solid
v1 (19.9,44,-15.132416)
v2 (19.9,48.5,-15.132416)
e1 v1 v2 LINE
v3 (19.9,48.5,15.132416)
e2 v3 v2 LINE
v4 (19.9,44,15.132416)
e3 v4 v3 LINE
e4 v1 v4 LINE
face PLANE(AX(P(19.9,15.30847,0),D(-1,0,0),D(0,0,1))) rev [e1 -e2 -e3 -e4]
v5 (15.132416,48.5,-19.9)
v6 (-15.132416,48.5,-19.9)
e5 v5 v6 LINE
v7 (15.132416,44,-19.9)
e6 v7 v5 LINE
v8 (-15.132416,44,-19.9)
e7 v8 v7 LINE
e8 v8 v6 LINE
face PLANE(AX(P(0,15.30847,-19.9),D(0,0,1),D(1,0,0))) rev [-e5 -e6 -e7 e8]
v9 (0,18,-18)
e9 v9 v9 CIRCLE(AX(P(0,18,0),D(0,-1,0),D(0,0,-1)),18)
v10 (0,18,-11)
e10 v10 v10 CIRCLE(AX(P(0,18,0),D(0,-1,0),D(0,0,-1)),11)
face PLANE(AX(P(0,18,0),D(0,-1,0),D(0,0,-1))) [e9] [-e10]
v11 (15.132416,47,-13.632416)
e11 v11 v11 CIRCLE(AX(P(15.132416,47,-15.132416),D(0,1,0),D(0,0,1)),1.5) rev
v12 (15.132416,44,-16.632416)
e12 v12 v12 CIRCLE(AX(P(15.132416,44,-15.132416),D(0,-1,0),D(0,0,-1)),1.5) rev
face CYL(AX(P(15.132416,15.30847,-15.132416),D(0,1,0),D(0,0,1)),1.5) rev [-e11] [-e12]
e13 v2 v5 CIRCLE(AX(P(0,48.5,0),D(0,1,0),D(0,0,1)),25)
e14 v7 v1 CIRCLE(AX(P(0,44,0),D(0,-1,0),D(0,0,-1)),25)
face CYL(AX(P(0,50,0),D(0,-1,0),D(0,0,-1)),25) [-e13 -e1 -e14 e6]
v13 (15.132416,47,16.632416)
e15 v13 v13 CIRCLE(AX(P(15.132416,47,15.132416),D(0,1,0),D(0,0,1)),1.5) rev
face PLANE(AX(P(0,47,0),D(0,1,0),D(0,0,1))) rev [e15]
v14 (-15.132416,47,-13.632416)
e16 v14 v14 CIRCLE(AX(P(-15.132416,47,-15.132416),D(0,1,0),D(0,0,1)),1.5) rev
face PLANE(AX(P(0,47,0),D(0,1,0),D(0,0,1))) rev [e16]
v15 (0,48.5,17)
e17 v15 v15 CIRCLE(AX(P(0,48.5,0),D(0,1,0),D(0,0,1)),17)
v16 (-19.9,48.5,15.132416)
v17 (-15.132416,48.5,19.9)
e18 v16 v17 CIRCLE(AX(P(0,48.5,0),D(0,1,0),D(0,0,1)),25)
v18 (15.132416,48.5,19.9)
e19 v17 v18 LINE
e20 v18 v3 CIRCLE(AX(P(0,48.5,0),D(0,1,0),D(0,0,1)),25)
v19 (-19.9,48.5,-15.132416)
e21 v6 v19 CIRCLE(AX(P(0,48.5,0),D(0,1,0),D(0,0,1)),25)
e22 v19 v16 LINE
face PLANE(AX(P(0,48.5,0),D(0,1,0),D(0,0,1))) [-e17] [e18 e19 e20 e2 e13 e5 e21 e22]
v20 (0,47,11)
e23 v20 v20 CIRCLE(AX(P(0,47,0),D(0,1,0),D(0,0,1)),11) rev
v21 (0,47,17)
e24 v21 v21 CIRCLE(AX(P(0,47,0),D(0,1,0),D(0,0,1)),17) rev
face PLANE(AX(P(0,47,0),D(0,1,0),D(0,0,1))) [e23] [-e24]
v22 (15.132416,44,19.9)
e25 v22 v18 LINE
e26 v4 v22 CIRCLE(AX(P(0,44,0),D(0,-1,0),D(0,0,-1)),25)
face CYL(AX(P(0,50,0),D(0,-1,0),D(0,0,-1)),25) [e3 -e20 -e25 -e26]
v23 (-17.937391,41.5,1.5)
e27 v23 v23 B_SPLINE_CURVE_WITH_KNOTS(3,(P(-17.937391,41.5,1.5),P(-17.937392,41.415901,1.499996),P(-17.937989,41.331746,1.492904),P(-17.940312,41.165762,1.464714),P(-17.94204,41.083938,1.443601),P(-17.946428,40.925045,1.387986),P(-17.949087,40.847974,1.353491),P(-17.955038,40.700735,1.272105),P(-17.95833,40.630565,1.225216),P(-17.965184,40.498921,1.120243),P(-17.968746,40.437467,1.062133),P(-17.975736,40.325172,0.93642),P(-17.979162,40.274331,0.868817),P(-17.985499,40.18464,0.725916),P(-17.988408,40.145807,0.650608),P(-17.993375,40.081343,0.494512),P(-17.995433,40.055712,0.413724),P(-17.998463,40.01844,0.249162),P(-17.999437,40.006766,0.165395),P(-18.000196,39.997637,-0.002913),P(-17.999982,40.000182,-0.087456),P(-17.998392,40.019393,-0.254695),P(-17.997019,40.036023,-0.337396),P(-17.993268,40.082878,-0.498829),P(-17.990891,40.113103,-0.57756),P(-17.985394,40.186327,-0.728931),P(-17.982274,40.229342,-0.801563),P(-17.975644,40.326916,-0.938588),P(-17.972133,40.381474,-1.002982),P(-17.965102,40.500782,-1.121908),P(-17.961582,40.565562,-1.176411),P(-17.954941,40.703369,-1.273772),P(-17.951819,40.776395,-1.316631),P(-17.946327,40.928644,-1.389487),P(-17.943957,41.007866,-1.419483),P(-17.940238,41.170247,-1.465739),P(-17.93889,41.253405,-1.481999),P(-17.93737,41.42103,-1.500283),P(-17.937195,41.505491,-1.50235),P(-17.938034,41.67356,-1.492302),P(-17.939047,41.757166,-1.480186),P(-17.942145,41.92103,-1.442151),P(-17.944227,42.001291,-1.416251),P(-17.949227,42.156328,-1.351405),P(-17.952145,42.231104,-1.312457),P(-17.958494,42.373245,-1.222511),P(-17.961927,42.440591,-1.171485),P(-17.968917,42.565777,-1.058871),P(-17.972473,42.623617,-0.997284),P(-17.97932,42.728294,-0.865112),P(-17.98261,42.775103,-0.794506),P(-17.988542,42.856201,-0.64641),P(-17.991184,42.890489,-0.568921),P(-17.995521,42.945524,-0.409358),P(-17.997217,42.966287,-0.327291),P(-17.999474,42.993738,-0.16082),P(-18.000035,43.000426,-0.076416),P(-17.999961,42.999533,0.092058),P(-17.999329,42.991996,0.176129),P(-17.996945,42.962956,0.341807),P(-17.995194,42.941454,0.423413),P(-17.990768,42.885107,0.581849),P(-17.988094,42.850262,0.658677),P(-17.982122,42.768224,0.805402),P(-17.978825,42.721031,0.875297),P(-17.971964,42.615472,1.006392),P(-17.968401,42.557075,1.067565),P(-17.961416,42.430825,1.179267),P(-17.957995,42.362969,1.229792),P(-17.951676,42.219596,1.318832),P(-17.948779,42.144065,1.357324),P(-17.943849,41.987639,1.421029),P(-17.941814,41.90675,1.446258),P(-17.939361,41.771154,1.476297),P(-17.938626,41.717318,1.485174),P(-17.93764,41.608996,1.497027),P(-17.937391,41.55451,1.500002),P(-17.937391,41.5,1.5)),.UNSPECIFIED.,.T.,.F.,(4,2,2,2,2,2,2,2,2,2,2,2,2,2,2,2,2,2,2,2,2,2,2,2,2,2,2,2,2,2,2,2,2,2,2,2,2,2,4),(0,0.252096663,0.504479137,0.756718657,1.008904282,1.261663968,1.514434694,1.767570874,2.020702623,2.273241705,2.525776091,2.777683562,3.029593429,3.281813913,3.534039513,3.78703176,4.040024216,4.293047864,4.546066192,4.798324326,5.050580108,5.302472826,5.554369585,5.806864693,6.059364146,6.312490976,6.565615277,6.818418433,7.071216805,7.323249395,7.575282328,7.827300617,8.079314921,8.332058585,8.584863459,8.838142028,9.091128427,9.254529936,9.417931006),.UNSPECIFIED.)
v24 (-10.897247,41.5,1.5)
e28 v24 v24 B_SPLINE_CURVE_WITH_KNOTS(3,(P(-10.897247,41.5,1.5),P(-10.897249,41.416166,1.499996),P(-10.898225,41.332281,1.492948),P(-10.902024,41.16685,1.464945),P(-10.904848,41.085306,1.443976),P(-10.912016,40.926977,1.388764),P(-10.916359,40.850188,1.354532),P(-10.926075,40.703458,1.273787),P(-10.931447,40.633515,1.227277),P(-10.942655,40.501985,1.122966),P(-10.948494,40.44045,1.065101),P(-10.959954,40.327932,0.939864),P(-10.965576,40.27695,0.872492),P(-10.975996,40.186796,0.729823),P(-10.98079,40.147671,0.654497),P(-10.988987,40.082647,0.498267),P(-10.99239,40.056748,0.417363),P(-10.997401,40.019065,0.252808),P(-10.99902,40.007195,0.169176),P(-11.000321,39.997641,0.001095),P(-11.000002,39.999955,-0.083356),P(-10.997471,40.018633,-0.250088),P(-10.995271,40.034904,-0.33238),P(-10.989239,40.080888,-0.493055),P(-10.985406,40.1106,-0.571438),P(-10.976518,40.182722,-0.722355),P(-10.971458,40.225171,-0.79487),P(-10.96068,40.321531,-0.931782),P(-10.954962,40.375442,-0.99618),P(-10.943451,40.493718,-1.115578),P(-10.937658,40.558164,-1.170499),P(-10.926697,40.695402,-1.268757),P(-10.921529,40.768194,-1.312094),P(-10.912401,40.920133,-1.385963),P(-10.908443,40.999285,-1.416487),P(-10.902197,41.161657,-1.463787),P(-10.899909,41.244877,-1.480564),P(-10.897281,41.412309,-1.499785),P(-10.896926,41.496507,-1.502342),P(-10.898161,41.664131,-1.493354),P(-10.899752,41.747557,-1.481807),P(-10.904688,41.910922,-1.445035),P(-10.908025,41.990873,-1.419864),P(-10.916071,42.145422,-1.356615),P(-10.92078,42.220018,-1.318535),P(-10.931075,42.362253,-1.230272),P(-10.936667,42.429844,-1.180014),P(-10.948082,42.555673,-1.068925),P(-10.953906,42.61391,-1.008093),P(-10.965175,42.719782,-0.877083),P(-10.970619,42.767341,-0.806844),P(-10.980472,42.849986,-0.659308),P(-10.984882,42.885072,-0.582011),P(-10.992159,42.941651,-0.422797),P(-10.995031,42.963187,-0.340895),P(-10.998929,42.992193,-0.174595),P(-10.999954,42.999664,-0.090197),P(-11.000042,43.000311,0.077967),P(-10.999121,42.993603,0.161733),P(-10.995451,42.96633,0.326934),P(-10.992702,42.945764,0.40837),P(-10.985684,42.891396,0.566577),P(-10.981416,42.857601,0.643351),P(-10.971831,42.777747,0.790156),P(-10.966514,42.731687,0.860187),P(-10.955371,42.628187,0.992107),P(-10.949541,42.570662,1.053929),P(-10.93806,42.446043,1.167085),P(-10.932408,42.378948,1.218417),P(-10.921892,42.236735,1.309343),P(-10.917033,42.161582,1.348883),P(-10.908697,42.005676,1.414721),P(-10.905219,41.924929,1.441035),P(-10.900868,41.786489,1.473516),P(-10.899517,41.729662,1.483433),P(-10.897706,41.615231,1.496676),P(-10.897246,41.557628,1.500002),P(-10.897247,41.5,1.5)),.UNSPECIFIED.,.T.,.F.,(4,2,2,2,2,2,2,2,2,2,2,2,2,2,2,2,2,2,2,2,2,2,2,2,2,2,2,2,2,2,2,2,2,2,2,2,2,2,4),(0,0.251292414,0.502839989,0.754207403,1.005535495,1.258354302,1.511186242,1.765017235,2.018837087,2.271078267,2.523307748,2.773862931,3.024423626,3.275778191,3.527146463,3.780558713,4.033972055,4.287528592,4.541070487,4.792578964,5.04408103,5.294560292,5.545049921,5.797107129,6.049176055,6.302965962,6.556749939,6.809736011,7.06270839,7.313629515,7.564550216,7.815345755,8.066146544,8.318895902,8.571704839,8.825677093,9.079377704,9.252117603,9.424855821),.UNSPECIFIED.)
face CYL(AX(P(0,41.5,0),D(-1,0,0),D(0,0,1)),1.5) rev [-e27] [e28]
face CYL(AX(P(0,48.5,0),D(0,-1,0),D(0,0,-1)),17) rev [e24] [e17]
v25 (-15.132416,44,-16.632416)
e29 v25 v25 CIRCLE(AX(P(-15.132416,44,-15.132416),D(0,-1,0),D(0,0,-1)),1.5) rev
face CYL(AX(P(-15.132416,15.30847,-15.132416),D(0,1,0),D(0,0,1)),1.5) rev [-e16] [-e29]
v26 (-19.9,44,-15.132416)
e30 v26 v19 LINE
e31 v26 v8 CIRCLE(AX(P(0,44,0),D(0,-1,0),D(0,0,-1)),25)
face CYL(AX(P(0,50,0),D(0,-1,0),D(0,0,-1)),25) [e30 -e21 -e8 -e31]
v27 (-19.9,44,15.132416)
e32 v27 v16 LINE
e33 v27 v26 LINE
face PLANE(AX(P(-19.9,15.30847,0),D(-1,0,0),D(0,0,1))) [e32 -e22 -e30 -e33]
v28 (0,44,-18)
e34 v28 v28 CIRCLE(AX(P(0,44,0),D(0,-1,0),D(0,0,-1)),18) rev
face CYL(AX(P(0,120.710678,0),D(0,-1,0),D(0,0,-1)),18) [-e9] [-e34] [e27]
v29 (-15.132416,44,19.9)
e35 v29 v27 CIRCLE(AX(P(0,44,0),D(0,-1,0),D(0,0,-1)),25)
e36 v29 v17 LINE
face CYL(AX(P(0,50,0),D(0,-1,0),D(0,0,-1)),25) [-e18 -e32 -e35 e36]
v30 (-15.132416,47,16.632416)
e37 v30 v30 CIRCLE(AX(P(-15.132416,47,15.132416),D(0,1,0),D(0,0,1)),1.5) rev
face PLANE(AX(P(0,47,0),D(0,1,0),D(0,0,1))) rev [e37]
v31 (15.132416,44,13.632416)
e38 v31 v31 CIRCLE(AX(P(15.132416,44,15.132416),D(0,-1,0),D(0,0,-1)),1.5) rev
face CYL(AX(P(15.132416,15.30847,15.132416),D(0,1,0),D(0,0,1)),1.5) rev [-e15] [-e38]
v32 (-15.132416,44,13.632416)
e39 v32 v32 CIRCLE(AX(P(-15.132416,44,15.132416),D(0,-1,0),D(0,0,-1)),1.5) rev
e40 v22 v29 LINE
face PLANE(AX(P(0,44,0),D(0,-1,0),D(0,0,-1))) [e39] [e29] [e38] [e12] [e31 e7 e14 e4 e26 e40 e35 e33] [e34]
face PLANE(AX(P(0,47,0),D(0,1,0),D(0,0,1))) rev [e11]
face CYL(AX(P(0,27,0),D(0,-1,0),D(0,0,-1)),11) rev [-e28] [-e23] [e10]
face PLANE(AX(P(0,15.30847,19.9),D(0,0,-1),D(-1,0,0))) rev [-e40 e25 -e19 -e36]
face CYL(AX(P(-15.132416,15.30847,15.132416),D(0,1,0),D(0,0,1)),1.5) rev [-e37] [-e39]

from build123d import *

# Parameters (mm, degrees)
SKETCH1_R              = 25
BOSS_EXTRUDE1_DEPTH    = 50
SKETCH2_R              = 25
SKETCH2_R_2            = 18
CUT_EXTRUDE1_DEPTH     = 46
CUT_EXTRUDE2_START     = -4
CUT_EXTRUDE2_OUTLINE_R = 1.5
CUT_EXTRUDE2_DEPTH     = 4
SKETCH6_R              = 6.5
CUT_EXTRUDE5_DEPTH     = 5
SKETCH8_R              = 11
CUT_EXTRUDE6_DEPTH     = 13
SKETCH9_R              = 11
CUT_EXTRUDE7_DEPTH     = 5
SKETCH10_R             = 4
CUT_EXTRUDE8_DEPTH     = 58.37612744
SKETCH11_R             = 11
SKETCH11_R_2           = 4
CUT_EXTRUDE9_DEPTH     = 27
SKETCH13_R             = 18
SKETCH13_R_2           = 11
CUT_EXTRUDE10_DEPTH    = 18
CUT_EXTRUDE13_START    = -3
CUT_EXTRUDE13_DEPTH    = 3
BOSS_EXTRUDE4_START    = 2
SKETCH19_R             = 1.5
SKETCH19_R_2           = 18
BOSS_EXTRUDE4_DEPTH    = 2
F_3DSKETCH11_R         = 1.5
CUT_EXTRUDE14_DEPTH    = 19.9
SKETCH20_R             = 11
CUT_EXTRUDE15_DEPTH    = 5
SKETCH21_R             = 17
BOSS_EXTRUDE5_DEPTH    = 1.5


with BuildPart() as part:
    # Sketch1 → Boss-Extrude1 (new body)
    with BuildSketch(Plane(origin=(0, 0, 0), x_dir=(1, 0, 0), z_dir=(0, 1, 0))):
        with Locations(Location((0, 0, 0), (0, 0, 270))):
            Circle(SKETCH1_R)
    extrude(amount=BOSS_EXTRUDE1_DEPTH)

    # Sketch2 → Cut-Extrude1 (cut)
    with BuildSketch(Plane.XZ):
        with Locations(Location((0, 0, 0), (0, 0, 90))):
            Circle(SKETCH2_R)
        with Locations(Location((0, 0, 0), (0, 0, 270))):
            Circle(SKETCH2_R_2, mode=Mode.SUBTRACT)
    extrude(amount=-CUT_EXTRUDE1_DEPTH, mode=Mode.SUBTRACT)

    # Cut-Extrude2: read off the stored shape, not the designer's step
    # Cut-Extrude2 outline → Cut-Extrude2 (cut)
    with BuildSketch(Plane(origin=(0, 50, 0), x_dir=(1, 0, 0), z_dir=(0, 1, 0)).offset(CUT_EXTRUDE2_START)):
        with BuildLine():
            ThreePointArc((-15.132415538, -19.9), (0, -25), (15.132415538, -19.9))
            Line((15.132415538, -19.9), (-15.132415538, -19.9))
        make_face()
        with BuildLine():
            Line((19.9, 15.132415538), (19.9, -15.132415538))
            ThreePointArc((19.9, -15.132415538), (25, 0), (19.9, 15.132415538))
        make_face()
        with BuildLine():
            ThreePointArc((-19.9, 15.132415538), (-25, 0), (-19.9, -15.132415538))
            Line((-19.9, -15.132415538), (-19.9, 15.132415538))
        make_face()
        with BuildLine():
            Line((-15.132415538, 19.9), (15.132415538, 19.9))
            ThreePointArc((15.132415538, 19.9), (0, 25), (-15.132415538, 19.9))
        make_face()
        with Locations((-15.132415538, -15.132415538)):
            Circle(CUT_EXTRUDE2_OUTLINE_R)
        with Locations((15.132415538, -15.132415538)):
            Circle(CUT_EXTRUDE2_OUTLINE_R)
        with Locations((-15.132415538, 15.132415538)):
            Circle(CUT_EXTRUDE2_OUTLINE_R)
        with Locations((15.132415538, 15.132415538)):
            Circle(CUT_EXTRUDE2_OUTLINE_R)
    extrude(amount=CUT_EXTRUDE2_DEPTH, mode=Mode.SUBTRACT)

    # Sketch6 → Cut-Extrude5 (cut)
    with BuildSketch(Plane(origin=(0, 50, 0), x_dir=(1, 0, 0), z_dir=(0, 1, 0))):
        with Locations(Location((0, 0, 0), (0, 0, 270))):
            Circle(SKETCH6_R)
    extrude(amount=-CUT_EXTRUDE5_DEPTH, mode=Mode.SUBTRACT)

    # Sketch8 → Cut-Extrude6 (cut)
    with BuildSketch(Plane(origin=(0, 45, 0), x_dir=(1, 0, 0), z_dir=(0, 1, 0))):
        with Locations(Location((0, 0, 0), (0, 0, 270))):
            Circle(SKETCH8_R)
    extrude(amount=-CUT_EXTRUDE6_DEPTH, mode=Mode.SUBTRACT)

    # Sketch9 → Cut-Extrude7 (cut)
    with BuildSketch(Plane(origin=(0, 50, 0), x_dir=(1, 0, 0), z_dir=(0, 1, 0))):
        with Locations(Location((0, 0, 0), (0, 0, 270))):
            Circle(SKETCH9_R)
    extrude(amount=-CUT_EXTRUDE7_DEPTH, mode=Mode.SUBTRACT)

    # Sketch10 → Cut-Extrude8 (cut, through all)
    with BuildSketch(Plane.XZ):
        with Locations(Location((0, 0, 0), (0, 0, 270))):
            Circle(SKETCH10_R)
    extrude(amount=-CUT_EXTRUDE8_DEPTH, mode=Mode.SUBTRACT)

    # Sketch11 → Cut-Extrude9 (cut)
    with BuildSketch(Plane.XZ):
        with Locations(Location((0, 0, 0), (0, 0, 90))):
            Circle(SKETCH11_R)
        with Locations(Location((0, 0, 0), (0, 0, 270))):
            Circle(SKETCH11_R_2, mode=Mode.SUBTRACT)
    extrude(amount=-CUT_EXTRUDE9_DEPTH, mode=Mode.SUBTRACT)

    # Sketch13 → Cut-Extrude10 (cut)
    with BuildSketch(Plane.XZ):
        with Locations(Location((0, 0, 0), (0, 0, 270))):
            Circle(SKETCH13_R)
        with Locations(Location((0, 0, 0), (0, 0, 270))):
            Circle(SKETCH13_R_2, mode=Mode.SUBTRACT)
    extrude(amount=-CUT_EXTRUDE10_DEPTH, mode=Mode.SUBTRACT)

    # Sketch18 → Cut-Extrude13 (cut)
    with BuildSketch(Plane(origin=(0, 50, 0), x_dir=(1, 0, 0), z_dir=(0, 1, 0)).offset(CUT_EXTRUDE13_START)):
        with BuildLine():
            Line((-19.9, 15.132415538), (-19.9, -15.132415538))
            ThreePointArc((-19.9, -15.132415538), (-17.67766953, -17.67766953), (-15.132415538, -19.9))
            Line((-15.132415538, -19.9), (15.132415538, -19.9))
            ThreePointArc((15.132415538, -19.9), (17.67766953, -17.67766953), (19.9, -15.132415538))
            Line((19.9, -15.132415538), (19.9, 15.132415538))
            ThreePointArc((19.9, 15.132415538), (17.67766953, 17.67766953), (15.132415538, 19.9))
            Line((15.132415538, 19.9), (-15.132415538, 19.9))
            ThreePointArc((-15.132415538, 19.9), (-17.67766953, 17.67766953), (-19.9, 15.132415538))
        make_face()
    extrude(amount=CUT_EXTRUDE13_DEPTH, mode=Mode.SUBTRACT)

    # Sketch19 → Boss-Extrude4 (add)
    with BuildSketch(Plane.XZ.offset(-46).offset(BOSS_EXTRUDE4_START)):
        with BuildLine():
            ThreePointArc((-15.132415538, 19.9), (-17.67766953, 17.67766953), (-19.9, 15.132415538))
            Line((-19.9, 15.132415538), (-19.9, -15.132415538))
            ThreePointArc((-19.9, -15.132415538), (-17.67766953, -17.67766953), (-15.132415538, -19.9))
            Line((-15.132415538, -19.9), (15.132415538, -19.9))
            ThreePointArc((15.132415538, -19.9), (17.67766953, -17.67766953), (19.9, -15.132415538))
            Line((19.9, -15.132415538), (19.9, 15.132415538))
            ThreePointArc((19.9, 15.132415538), (17.67766953, 17.67766953), (15.132415538, 19.9))
            Line((15.132415538, 19.9), (-15.132415538, 19.9))
        make_face()
        with Locations(Location((-15.132415538, -15.132415538, 0), (0, 0, 90))):
            Circle(SKETCH19_R, mode=Mode.SUBTRACT)
        with Locations(Location((-15.132415538, 15.132415538, 0), (0, 0, 90))):
            Circle(SKETCH19_R, mode=Mode.SUBTRACT)
        with Locations(Location((0, 0, 0), (0, 0, 270))):
            Circle(SKETCH19_R_2, mode=Mode.SUBTRACT)
        with Locations(Location((15.132415538, 15.132415538, 0), (0, 0, 90))):
            Circle(SKETCH19_R, mode=Mode.SUBTRACT)
        with Locations(Location((15.132415538, -15.132415538, 0), (0, 0, 90))):
            Circle(SKETCH19_R, mode=Mode.SUBTRACT)
    extrude(amount=-BOSS_EXTRUDE4_DEPTH)

    # 3DSketch11 → Cut-Extrude14 (cut)
    with BuildSketch(Plane(origin=(0, 44, 0), x_dir=(0, -1, 0), z_dir=(-1, 0, 0))):
        with Locations(Location((2.5, 0, 0), (0, 0, 90))):
            Circle(F_3DSKETCH11_R)
    extrude(amount=CUT_EXTRUDE14_DEPTH, mode=Mode.SUBTRACT)

    # Sketch20 → Cut-Extrude15 (cut)
    with BuildSketch(Plane.XZ.offset(-27)):
        with Locations(Location((0, 0, 0), (0, 0, 270))):
            Circle(SKETCH20_R)
    extrude(amount=-CUT_EXTRUDE15_DEPTH, mode=Mode.SUBTRACT)

    # Sketch21 → Boss-Extrude5 (add)
    with BuildSketch(Plane(origin=(0, 47, 0), x_dir=(1, 0, 0), z_dir=(0, 1, 0))):
        with BuildLine():
            Line((-19.9, 15.132415538), (-19.9, -15.132415538))
            ThreePointArc((-19.9, -15.132415538), (-17.67766953, -17.67766953), (-15.132415538, -19.9))
            Line((-15.132415538, -19.9), (15.132415538, -19.9))
            ThreePointArc((15.132415538, -19.9), (17.67766953, -17.67766953), (19.9, -15.132415538))
            Line((19.9, -15.132415538), (19.9, 15.132415538))
            ThreePointArc((19.9, 15.132415538), (17.67766953, 17.67766953), (15.132415538, 19.9))
            Line((15.132415538, 19.9), (-15.132415538, 19.9))
            ThreePointArc((-15.132415538, 19.9), (-17.67766953, 17.67766953), (-19.9, 15.132415538))
        make_face()
        with Locations(Location((0, 0, 0), (0, 0, 270))):
            Circle(SKETCH21_R, mode=Mode.SUBTRACT)
    extrude(amount=BOSS_EXTRUDE5_DEPTH)


solid = part.part
